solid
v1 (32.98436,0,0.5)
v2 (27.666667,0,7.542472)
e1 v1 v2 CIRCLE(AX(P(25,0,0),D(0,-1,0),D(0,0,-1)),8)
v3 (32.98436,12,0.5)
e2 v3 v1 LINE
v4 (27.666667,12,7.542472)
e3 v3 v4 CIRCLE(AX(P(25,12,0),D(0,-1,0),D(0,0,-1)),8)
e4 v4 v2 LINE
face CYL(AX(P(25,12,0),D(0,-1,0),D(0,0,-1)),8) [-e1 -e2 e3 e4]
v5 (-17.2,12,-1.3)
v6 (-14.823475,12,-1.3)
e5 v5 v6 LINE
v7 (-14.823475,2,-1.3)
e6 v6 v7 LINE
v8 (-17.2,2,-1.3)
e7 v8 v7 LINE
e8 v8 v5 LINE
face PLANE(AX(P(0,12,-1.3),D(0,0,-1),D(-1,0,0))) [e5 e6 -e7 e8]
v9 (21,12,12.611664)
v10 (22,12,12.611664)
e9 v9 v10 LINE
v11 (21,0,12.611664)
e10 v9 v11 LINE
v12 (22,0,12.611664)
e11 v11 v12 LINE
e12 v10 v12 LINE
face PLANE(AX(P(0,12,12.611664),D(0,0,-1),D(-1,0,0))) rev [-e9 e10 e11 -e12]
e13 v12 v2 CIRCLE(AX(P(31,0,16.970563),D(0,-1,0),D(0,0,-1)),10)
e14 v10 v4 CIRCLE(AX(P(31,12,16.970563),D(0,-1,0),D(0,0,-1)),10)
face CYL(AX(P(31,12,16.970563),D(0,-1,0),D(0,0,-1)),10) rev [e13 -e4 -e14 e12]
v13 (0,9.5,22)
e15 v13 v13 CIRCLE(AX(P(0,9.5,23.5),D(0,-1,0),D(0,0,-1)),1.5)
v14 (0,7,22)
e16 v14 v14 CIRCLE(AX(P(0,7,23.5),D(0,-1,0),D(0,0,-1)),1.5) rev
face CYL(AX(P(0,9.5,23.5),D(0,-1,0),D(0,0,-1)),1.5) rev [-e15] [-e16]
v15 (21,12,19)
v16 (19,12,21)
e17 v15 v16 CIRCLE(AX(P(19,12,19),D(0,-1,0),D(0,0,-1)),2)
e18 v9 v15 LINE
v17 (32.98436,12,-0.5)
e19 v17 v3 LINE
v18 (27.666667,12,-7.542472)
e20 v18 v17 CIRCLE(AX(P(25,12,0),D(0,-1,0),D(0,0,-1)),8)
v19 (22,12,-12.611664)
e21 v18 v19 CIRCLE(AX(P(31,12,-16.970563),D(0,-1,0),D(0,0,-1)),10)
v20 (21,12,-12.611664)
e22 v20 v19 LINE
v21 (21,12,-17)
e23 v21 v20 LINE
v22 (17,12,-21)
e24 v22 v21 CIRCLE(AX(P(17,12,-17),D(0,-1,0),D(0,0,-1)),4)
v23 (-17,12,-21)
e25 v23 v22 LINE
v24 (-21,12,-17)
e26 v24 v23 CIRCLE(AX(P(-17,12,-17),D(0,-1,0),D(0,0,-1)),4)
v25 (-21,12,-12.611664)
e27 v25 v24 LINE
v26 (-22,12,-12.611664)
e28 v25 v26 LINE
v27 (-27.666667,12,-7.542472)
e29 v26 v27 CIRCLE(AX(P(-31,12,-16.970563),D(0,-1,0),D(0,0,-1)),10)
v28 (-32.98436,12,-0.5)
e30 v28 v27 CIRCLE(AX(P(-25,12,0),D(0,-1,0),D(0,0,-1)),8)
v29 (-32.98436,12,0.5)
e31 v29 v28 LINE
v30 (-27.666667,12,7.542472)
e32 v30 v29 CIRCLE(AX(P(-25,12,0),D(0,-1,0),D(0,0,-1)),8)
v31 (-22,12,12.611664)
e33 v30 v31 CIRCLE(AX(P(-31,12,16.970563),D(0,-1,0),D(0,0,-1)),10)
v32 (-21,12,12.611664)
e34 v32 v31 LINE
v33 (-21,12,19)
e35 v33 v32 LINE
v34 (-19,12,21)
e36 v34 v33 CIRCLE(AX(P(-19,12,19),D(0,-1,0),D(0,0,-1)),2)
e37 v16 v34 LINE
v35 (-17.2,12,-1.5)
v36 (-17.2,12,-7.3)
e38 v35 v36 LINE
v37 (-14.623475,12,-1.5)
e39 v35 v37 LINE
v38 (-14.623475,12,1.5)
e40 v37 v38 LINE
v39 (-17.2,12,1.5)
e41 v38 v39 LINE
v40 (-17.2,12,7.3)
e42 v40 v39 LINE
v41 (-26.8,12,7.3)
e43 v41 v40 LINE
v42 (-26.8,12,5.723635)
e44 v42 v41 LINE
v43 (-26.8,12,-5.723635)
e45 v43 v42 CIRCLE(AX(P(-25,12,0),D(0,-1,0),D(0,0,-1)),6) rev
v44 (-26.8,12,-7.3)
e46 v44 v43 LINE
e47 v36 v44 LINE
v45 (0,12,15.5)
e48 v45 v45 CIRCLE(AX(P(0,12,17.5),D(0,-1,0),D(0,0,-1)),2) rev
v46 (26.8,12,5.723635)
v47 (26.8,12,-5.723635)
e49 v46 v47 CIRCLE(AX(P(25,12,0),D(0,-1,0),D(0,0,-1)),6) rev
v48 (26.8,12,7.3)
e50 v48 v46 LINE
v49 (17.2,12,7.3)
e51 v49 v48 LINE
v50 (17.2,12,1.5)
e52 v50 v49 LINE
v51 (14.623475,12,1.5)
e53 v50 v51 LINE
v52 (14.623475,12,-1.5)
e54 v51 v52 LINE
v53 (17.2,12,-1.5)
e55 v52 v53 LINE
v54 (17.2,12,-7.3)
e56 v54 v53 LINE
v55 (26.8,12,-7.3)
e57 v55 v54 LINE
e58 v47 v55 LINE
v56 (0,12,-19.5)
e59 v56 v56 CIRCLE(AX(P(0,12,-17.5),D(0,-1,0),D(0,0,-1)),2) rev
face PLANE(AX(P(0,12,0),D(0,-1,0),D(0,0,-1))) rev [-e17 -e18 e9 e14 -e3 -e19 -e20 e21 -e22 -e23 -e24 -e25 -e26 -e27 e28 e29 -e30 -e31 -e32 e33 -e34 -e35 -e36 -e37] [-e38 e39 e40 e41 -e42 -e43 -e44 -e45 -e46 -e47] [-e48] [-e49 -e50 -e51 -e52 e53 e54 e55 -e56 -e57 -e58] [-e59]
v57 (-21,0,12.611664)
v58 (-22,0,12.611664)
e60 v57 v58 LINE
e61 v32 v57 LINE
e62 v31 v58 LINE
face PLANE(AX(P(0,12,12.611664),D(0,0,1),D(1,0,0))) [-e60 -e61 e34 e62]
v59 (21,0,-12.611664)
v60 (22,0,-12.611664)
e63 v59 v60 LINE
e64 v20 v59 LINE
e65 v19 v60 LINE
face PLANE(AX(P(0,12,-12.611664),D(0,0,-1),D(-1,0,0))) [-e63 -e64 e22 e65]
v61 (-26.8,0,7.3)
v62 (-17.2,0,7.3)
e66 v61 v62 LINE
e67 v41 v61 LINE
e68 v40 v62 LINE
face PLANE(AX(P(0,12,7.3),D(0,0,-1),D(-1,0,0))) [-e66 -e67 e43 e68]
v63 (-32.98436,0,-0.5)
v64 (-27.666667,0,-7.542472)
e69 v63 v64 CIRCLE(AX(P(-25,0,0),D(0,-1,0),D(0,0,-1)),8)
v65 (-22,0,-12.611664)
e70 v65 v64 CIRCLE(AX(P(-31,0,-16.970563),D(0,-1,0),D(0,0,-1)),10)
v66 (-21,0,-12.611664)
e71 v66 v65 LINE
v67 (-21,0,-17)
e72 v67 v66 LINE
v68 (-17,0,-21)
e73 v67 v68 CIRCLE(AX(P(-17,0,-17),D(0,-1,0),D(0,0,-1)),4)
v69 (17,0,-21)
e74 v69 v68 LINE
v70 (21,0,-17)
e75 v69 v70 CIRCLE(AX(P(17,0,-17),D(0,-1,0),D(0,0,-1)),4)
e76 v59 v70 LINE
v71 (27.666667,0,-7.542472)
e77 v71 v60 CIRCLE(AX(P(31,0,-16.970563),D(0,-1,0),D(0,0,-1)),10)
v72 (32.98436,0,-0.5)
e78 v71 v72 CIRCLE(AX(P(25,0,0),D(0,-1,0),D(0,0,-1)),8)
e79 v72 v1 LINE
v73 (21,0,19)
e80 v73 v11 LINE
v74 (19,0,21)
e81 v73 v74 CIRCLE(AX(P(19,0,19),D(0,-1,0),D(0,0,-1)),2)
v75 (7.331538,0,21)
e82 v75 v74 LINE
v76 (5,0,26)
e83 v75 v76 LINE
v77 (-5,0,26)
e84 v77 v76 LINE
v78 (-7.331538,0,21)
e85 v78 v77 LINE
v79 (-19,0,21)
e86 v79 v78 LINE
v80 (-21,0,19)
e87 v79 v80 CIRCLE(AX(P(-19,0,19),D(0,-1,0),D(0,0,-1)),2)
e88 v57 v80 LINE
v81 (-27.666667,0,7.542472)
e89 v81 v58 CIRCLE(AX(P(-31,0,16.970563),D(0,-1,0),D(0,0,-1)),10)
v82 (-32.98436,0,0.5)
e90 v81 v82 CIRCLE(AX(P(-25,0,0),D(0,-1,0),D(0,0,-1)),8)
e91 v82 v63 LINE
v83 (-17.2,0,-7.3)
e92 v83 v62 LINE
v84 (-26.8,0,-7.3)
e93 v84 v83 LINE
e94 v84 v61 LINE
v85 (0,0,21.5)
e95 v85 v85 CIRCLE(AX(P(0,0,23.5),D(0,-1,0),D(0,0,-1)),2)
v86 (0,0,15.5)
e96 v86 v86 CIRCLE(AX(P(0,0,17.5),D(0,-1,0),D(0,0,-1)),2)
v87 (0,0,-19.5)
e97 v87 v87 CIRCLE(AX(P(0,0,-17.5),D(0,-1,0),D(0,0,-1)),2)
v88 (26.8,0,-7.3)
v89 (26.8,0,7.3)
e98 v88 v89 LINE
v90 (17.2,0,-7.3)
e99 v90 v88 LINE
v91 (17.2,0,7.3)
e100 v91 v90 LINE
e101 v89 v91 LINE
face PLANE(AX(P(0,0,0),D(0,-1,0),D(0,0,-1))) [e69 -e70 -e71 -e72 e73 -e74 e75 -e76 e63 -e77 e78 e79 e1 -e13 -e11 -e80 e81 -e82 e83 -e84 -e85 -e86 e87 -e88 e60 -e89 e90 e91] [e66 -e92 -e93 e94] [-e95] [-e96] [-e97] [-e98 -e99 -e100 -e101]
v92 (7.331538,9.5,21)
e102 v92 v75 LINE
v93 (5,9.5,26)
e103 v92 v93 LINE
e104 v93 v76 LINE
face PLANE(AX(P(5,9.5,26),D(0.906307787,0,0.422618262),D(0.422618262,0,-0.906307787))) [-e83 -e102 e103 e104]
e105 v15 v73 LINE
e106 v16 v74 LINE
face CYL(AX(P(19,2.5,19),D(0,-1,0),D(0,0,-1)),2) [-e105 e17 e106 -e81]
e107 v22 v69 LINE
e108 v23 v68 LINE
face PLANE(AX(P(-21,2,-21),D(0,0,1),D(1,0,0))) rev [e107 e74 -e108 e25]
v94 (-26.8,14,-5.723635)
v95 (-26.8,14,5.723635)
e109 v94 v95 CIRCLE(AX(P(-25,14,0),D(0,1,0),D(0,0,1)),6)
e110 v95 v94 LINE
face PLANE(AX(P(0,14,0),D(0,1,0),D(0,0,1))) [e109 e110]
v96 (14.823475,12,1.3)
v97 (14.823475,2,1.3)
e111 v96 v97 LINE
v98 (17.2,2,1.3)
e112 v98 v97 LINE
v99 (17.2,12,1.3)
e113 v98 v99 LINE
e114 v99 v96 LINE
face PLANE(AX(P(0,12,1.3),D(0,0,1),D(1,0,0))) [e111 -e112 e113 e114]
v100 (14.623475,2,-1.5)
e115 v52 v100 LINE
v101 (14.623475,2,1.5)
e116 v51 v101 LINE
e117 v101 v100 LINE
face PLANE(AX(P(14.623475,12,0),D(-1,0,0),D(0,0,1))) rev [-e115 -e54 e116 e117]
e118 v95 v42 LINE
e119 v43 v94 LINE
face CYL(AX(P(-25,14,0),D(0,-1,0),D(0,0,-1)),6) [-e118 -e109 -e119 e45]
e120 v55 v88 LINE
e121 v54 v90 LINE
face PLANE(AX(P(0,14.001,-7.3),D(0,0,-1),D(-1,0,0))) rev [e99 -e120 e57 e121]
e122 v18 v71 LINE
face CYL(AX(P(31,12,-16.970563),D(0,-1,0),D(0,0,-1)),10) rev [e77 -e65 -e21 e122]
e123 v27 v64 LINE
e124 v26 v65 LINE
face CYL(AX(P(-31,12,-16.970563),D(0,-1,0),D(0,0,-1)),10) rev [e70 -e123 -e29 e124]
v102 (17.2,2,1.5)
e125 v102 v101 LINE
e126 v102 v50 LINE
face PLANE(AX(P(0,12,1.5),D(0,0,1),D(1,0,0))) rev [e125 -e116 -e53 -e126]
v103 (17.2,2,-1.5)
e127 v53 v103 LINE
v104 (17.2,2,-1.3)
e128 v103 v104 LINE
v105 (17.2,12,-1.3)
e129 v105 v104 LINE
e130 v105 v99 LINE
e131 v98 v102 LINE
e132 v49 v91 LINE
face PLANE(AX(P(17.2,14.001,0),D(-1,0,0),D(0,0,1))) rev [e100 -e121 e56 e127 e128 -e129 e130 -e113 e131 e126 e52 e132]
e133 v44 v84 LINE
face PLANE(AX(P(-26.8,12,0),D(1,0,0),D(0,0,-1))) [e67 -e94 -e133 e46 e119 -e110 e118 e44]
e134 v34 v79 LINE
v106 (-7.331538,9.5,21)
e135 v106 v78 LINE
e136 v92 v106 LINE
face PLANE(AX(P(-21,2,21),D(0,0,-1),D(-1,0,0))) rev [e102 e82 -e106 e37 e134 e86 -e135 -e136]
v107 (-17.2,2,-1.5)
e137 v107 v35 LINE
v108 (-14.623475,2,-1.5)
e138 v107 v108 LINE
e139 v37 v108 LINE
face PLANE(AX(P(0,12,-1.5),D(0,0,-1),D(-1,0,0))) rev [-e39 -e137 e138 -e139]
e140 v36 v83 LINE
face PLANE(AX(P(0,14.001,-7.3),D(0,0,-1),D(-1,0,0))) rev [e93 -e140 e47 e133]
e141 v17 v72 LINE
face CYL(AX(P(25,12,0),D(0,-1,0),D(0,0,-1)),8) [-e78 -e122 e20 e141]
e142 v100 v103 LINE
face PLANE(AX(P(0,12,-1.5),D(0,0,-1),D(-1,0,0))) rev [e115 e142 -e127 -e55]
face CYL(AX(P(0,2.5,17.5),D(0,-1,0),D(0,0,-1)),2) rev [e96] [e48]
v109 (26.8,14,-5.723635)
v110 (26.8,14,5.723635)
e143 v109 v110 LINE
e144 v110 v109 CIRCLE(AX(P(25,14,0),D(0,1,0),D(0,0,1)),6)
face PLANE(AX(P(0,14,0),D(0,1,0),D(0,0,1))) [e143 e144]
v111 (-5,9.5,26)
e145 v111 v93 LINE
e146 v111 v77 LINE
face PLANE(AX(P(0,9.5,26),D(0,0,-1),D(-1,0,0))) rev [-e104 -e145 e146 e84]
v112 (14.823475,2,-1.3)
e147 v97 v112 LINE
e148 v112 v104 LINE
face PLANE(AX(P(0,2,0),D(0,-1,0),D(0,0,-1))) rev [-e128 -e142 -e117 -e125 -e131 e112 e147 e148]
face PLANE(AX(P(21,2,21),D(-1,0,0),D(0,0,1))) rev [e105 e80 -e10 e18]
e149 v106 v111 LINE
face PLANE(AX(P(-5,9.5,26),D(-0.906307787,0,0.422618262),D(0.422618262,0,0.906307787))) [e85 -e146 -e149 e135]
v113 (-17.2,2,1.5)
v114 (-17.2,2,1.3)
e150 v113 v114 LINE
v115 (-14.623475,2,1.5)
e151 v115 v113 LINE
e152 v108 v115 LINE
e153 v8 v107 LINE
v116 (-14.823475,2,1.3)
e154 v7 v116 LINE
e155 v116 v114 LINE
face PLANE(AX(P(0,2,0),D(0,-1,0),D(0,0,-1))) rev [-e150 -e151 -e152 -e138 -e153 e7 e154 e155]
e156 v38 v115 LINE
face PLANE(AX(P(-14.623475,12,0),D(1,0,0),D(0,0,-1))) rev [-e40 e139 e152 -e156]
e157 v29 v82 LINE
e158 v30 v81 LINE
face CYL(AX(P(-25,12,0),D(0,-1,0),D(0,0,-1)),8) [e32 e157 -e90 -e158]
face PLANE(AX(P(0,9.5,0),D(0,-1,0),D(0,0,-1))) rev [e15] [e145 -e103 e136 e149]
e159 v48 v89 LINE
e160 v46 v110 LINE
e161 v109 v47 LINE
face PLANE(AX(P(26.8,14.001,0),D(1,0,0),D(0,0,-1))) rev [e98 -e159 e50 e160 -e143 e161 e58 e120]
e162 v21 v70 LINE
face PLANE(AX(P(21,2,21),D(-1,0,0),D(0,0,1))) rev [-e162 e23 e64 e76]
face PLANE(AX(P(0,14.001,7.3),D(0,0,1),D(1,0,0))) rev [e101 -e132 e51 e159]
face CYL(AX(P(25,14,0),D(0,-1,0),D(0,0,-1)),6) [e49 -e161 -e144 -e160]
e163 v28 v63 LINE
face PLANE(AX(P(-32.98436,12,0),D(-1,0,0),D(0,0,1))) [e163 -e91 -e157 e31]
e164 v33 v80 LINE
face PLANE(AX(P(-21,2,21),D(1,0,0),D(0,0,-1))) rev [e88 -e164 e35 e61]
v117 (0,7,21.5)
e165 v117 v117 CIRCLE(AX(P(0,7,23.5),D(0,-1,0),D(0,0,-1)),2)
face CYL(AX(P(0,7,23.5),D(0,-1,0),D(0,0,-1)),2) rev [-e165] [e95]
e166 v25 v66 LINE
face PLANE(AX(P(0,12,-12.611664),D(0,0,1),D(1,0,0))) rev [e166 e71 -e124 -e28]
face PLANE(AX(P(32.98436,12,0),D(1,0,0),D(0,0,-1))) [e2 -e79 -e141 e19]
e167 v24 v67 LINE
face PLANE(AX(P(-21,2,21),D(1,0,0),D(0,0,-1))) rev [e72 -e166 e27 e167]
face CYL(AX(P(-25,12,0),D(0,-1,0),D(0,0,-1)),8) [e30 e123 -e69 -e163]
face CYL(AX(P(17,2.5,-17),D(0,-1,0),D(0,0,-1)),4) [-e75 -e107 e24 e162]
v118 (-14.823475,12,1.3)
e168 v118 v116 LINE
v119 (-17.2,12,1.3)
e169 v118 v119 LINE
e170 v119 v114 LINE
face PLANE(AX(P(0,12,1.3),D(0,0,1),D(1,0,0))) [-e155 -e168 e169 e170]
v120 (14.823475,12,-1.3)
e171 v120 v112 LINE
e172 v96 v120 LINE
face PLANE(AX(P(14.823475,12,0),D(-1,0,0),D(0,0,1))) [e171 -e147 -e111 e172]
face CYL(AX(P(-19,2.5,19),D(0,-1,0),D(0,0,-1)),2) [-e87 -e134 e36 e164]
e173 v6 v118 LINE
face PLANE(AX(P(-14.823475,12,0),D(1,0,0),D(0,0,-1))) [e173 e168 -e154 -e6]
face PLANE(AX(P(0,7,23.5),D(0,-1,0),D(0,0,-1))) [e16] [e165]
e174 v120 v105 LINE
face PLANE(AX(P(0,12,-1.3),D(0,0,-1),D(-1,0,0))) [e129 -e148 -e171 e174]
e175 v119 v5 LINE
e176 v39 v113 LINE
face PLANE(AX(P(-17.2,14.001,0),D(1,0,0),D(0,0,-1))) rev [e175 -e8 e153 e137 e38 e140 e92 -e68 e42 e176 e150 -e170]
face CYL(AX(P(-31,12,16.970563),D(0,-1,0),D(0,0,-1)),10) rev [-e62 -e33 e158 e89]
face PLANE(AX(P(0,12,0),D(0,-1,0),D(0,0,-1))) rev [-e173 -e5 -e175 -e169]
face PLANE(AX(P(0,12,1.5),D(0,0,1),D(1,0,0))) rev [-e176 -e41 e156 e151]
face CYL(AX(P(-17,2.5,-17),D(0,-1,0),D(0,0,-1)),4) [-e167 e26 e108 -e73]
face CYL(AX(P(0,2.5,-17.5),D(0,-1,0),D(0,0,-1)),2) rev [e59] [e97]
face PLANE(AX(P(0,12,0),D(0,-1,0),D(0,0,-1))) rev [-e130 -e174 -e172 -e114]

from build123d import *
from build123d.topology import SkipClean

# Parameters (mm, degrees)
SKETCH_1_W          = 42
SKETCH_1_H          = 42
EXTRUDE_1_DEPTH     = 2
EXTRUDE_2_DEPTH     = 0.5
SKETCH_3_R          = 2
SKETCH_3_R_2        = 1
CUT_EXTRUDE_1_DEPTH = 30.803523282
EXTRUDE_START       = -12
EXTRUDE_3_OUTLINE_R = 2
EXTRUDE_3_DEPTH     = 12
EXTRUDE_4_DEPTH     = 2
EXTRUDE_5_DEPTH     = 9.5
DRAFT_1_DEPTH       = 9.5
SKETCH_8_R          = 2
CUT_EXTRUDE_2_DEPTH = 7
CUT_EXTRUDE_3_REACH = 46.272
SKETCH_9_W          = 9.6
SKETCH_9_H          = 14.6
SKETCH_9_W_2        = 9
SKETCH_9_H_2        = 14


# Read off the part's stored shape, not the designer's step: Бобышка-Вытянуть3, Уклон1
with BuildPart() as part:
    # Эскиз1 → Бобышка-Вытянуть1 (new body)
    with BuildSketch(Plane(origin=(0, 0, 0), x_dir=(1, 0, 0), z_dir=(0, 1, 0))):
        Rectangle(SKETCH_1_W, SKETCH_1_H)
    extrude(amount=EXTRUDE_1_DEPTH)

    # Эскиз2 → Бобышка-Вытянуть2 (add)
    with BuildSketch(Plane(origin=(0, 2, 0), x_dir=(1, 0, 0), z_dir=(0, 1, 0))):
        with BuildLine():
            Line((-1.778376117, -14.123475383), (1.778376117, -14.123475383))
            ThreePointArc((1.778376117, -14.123475383), (15.863961031, -15.863961031), (14.123475383, -1.778376117))
            Line((14.123475383, -1.778376117), (14.123475383, 1.778376117))
            ThreePointArc((14.123475383, 1.778376117), (15.863961031, 15.863961031), (1.778376117, 14.123475383))
            Line((1.778376117, 14.123475383), (-1.778376117, 14.123475383))
            ThreePointArc((-1.778376117, 14.123475383), (-15.863961031, 15.863961031), (-14.123475383, 1.778376117))
            Line((-14.123475383, 1.778376117), (-14.123475383, -1.778376117))
            ThreePointArc((-14.123475383, -1.778376117), (-15.863961031, -15.863961031), (-1.778376117, -14.123475383))
        make_face()
    extrude(amount=EXTRUDE_2_DEPTH)

    # Эскиз3 → Вырез-Вытянуть1 (cut, through all)
    # profile 1 of 7: a face of its own
    with BuildSketch(Plane.XZ):
        with Locations(Location((0, -17.5, 0), (0, 0, 270))):
            Circle(SKETCH_3_R)
        with Locations((0, -17.5)):
            Circle(SKETCH_3_R_2, mode=Mode.SUBTRACT)
    # profile 2 of 7: a face of its own
    with BuildSketch(Plane.XZ):
        with BuildLine():
            Line((-21, -21), (-17, -21))
            ThreePointArc((-17, -21), (-19.828427125, -19.828427125), (-21, -17))
            Line((-21, -17), (-21, -21))
        make_face()
    # profile 3 of 7: a face of its own
    with BuildSketch(Plane.XZ):
        with BuildLine():
            ThreePointArc((21, -17), (19.828427125, -19.828427125), (17, -21))
            Line((17, -21), (21, -21))
            Line((21, -21), (21, -17))
        make_face()
    # profile 4 of 7: a face of its own
    with BuildSketch(Plane.XZ):
        with BuildLine():
            Line((21, 21), (19, 21))
            ThreePointArc((19, 21), (20.414213562, 20.414213562), (21, 19))
            Line((21, 19), (21, 21))
        make_face()
    # profile 5 of 7: a face of its own
    with BuildSketch(Plane.XZ):
        with Locations(Location((0, 17.5, 0), (0, 0, 270))):
            Circle(SKETCH_3_R)
        with Locations((0, 17.5)):
            Circle(SKETCH_3_R_2, mode=Mode.SUBTRACT)
    # profile 6 of 7: a face of its own
    with BuildSketch(Plane.XZ):
        with Locations((0, 17.5)):
            Circle(SKETCH_3_R_2)
    # profile 7 of 7: a face of its own
    with BuildSketch(Plane.XZ):
        with BuildLine():
            Line((-21, 21), (-21, 19))
            ThreePointArc((-21, 19), (-20.414213562, 20.414213562), (-19, 21))
            Line((-19, 21), (-21, 21))
        make_face()
    extrude(amount=-CUT_EXTRUDE_1_DEPTH, mode=Mode.SUBTRACT)


with BuildPart() as cut_extrude_1_kept_piece:
    # of the separate pieces the step leaves, the one the design keeps (cut_extrude_1_pieces_kept)
    add(part.part.solids().sort_by_distance((-19, 0, 21))[0])

    # Бобышка-Вытянуть3 outline → Бобышка-Вытянуть3 (add)
    with SkipClean():  # the faces are left unmerged after this step: merging them gives an invalid solid
        with BuildSketch(Plane.XZ.offset(EXTRUDE_START)):
            with BuildLine():
                Line((-22, -12.611663805), (-21, -12.611663805))
                Line((-21, -12.611663805), (-21, -17))
                ThreePointArc((-21, -17), (-19.828427125, -19.828427125), (-17, -21))
                Line((-17, -21), (17, -21))
                ThreePointArc((17, -21), (19.828427125, -19.828427125), (21, -17))
                Line((21, -17), (21, -12.611663805))
                Line((21, -12.611663805), (22, -12.611663805))
                ThreePointArc((22, -12.611663805), (24.332770191, -9.517506551), (27.666666667, -7.542472333))
                ThreePointArc((27.666666667, -7.542472333), (31.384371141, -4.820768106), (32.984359711, -0.5))
                Line((32.984359711, -0.5), (32.984359711, 0.5))
                ThreePointArc((32.984359711, 0.5), (31.384371141, 4.820768106), (27.666666667, 7.542472333))
                ThreePointArc((27.666666667, 7.542472333), (24.332770191, 9.517506551), (22, 12.611663805))
                Line((22, 12.611663805), (21, 12.611663805))
                Line((21, 12.611663805), (21, 19))
                ThreePointArc((21, 19), (20.414213562, 20.414213562), (19, 21))
                Line((19, 21), (-19, 21))
                ThreePointArc((-19, 21), (-20.414213562, 20.414213562), (-21, 19))
                Line((-21, 19), (-21, 12.611663805))
                Line((-21, 12.611663805), (-22, 12.611663805))
                ThreePointArc((-22, 12.611663805), (-24.332770191, 9.517506551), (-27.666666667, 7.542472333))
                ThreePointArc((-27.666666667, 7.542472333), (-31.384371141, 4.820768106), (-32.984359711, 0.5))
                Line((-32.984359711, 0.5), (-32.984359711, -0.5))
                ThreePointArc((-32.984359711, -0.5), (-31.384371141, -4.820768106), (-27.666666667, -7.542472333))
                ThreePointArc((-27.666666667, -7.542472333), (-24.332770191, -9.517506551), (-22, -12.611663805))
            make_face()
            with BuildLine():
                Line((-26.8, 7.3), (-21, 7.3))
                Line((-21, 7.3), (-21, 5.123475383))
                ThreePointArc((-21, 5.123475383), (-23.765130637, 6.381621867), (-26.8, 6.245798588))
                Line((-26.8, 6.245798588), (-26.8, 7.3))
            make_face(mode=Mode.SUBTRACT)
            with BuildLine():
                Line((14.623475383, -1.5), (14.623475383, 1.5))
                Line((14.623475383, 1.5), (18.67544468, 1.5))
                ThreePointArc((18.67544468, 1.5), (18.652597901, 1.400173775), (18.631326669, 1.3))
                Line((18.631326669, 1.3), (14.823475383, 1.3))
                Line((14.823475383, 1.3), (14.823475383, -1.3))
                Line((14.823475383, -1.3), (18.631326669, -1.3))
                ThreePointArc((18.631326669, -1.3), (18.652597901, -1.400173775), (18.67544468, -1.5))
                Line((18.67544468, -1.5), (14.623475383, -1.5))
            make_face(mode=Mode.SUBTRACT)
            with Locations((0, 17.5)):
                Circle(EXTRUDE_3_OUTLINE_R, mode=Mode.SUBTRACT)
            with Locations((0, -17.5)):
                Circle(EXTRUDE_3_OUTLINE_R, mode=Mode.SUBTRACT)
            with BuildLine():
                Line((-14.623475383, -1.5), (-18.67544468, -1.5))
                ThreePointArc((-18.67544468, -1.5), (-18.652597901, -1.400173775), (-18.631326669, -1.3))
                Line((-18.631326669, -1.3), (-14.823475383, -1.3))
                Line((-14.823475383, -1.3), (-14.823475383, 1.3))
                Line((-14.823475383, 1.3), (-18.631326669, 1.3))
                ThreePointArc((-18.631326669, 1.3), (-18.652597901, 1.400173775), (-18.67544468, 1.5))
                Line((-18.67544468, 1.5), (-14.623475383, 1.5))
                Line((-14.623475383, 1.5), (-14.623475383, -1.5))
            make_face(mode=Mode.SUBTRACT)
        extrude(amount=EXTRUDE_3_DEPTH)

    # Эскиз6 → Бобышка-Вытянуть4 (add)
    with SkipClean():  # the faces are left unmerged after this step: merging them gives an invalid solid
        with BuildSketch(Plane(origin=(0, 12, 0), x_dir=(1, 0, 0), z_dir=(0, 1, 0))):
            with BuildLine():
                ThreePointArc((-19.161948935, -1.384615385), (-19, 0), (-19.161948935, 1.384615385))
                ThreePointArc((-19.161948935, 1.384615385), (-19.949874575, 3.239789066), (-21.307692308, 4.729361892))
                ThreePointArc((-21.307692308, 4.729361892), (-31, 0), (-21.307692308, -4.729361892))
                ThreePointArc((-21.307692308, -4.729361892), (-19.949874575, -3.239789066), (-19.161948935, -1.384615385))
            make_face()
            with BuildLine():
                ThreePointArc((19.161948935, 1.384615385), (19, 0), (19.161948935, -1.384615385))
                ThreePointArc((19.161948935, -1.384615385), (19.949874575, -3.239789066), (21.307692308, -4.729361892))
                ThreePointArc((21.307692308, -4.729361892), (31, 0), (21.307692308, 4.729361892))
                ThreePointArc((21.307692308, 4.729361892), (19.949874575, 3.239789066), (19.161948935, 1.384615385))
            make_face()
        extrude(amount=EXTRUDE_4_DEPTH)

    # Эскиз7 → Бобышка-Вытянуть5 (add)
    with SkipClean():  # the faces are left unmerged after this step: merging them gives an invalid solid
        with BuildSketch(Plane.XZ):
            with BuildLine():
                Line((0, 22), (0, 21))
                Line((0, 21), (5, 21))
                Line((5, 21), (5, 26))
                Line((5, 26), (0, 26))
                Line((0, 26), (0, 25))
                ThreePointArc((0, 25), (1.060660172, 24.560660172), (1.5, 23.5))
                ThreePointArc((1.5, 23.5), (1.060660172, 22.439339828), (0, 22))
            make_face()
            with BuildLine():
                Line((-5, 21), (0, 21))
                Line((0, 21), (0, 22))
                ThreePointArc((0, 22), (-1.5, 23.5), (0, 25))
                Line((0, 25), (0, 26))
                Line((0, 26), (-5, 26))
                Line((-5, 26), (-5, 21))
            make_face()
        extrude(amount=-EXTRUDE_5_DEPTH)

    # Уклон1 outline → Уклон1 (add)
    with SkipClean():  # the faces are left unmerged after this step: merging them gives an invalid solid
        with BuildSketch(Plane(origin=(0, 0, 0), x_dir=(1, 0, 0), z_dir=(0, 1, 0))):
            Polygon((-5, -21), (-7.331538291, -21), (-5, -26), align=None)
            Polygon((7.331538291, -21), (5, -21), (5, -26), align=None)
        extrude(amount=DRAFT_1_DEPTH)

    # Эскиз8 → Вырез-Вытянуть2 (cut)
    with SkipClean():  # the faces are left unmerged after this step: merging them gives an invalid solid
        with BuildSketch(Plane.XZ):
            with Locations(Location((0, 23.5, 0), (0, 0, 270))):
                Circle(SKETCH_8_R)
        extrude(amount=-CUT_EXTRUDE_2_DEPTH, mode=Mode.SUBTRACT)

    # Эскиз9 → Вырез-Вытянуть3 (cut, up to next)
    with BuildSketch(Plane.XZ, mode=Mode.PRIVATE) as cut_extrude_3_sk1:
        with Locations((-22, 0)):
            Rectangle(SKETCH_9_W, SKETCH_9_H)
        with Locations((-22, 0)):
            Rectangle(SKETCH_9_W_2, SKETCH_9_H_2, mode=Mode.SUBTRACT)
    cut_extrude_3_tool1 = extrude(cut_extrude_3_sk1.sketch, amount=-CUT_EXTRUDE_3_REACH, mode=Mode.PRIVATE) & cut_extrude_1_kept_piece.part
    # Эскиз9 → Вырез-Вытянуть3 (cut, up to next)
    with BuildSketch(Plane.XZ, mode=Mode.PRIVATE) as cut_extrude_3_sk2:
        with Locations((-22, 0)):
            Rectangle(SKETCH_9_W_2, SKETCH_9_H_2)
    cut_extrude_3_tool2 = extrude(cut_extrude_3_sk2.sketch, amount=-CUT_EXTRUDE_3_REACH, mode=Mode.PRIVATE) & cut_extrude_1_kept_piece.part
    # Эскиз9 → Вырез-Вытянуть3 (cut, up to next)
    with BuildSketch(Plane.XZ, mode=Mode.PRIVATE) as cut_extrude_3_sk3:
        with Locations((22, 0)):
            Rectangle(SKETCH_9_W, SKETCH_9_H)
        with Locations((22, 0)):
            Rectangle(SKETCH_9_W_2, SKETCH_9_H_2, mode=Mode.SUBTRACT)
    cut_extrude_3_tool3 = extrude(cut_extrude_3_sk3.sketch, amount=-CUT_EXTRUDE_3_REACH, mode=Mode.PRIVATE) & cut_extrude_1_kept_piece.part
    # Эскиз9 → Вырез-Вытянуть3 (cut, up to next)
    with BuildSketch(Plane.XZ, mode=Mode.PRIVATE) as cut_extrude_3_sk4:
        with Locations((22, 0)):
            Rectangle(SKETCH_9_W_2, SKETCH_9_H_2)
    cut_extrude_3_tool4 = extrude(cut_extrude_3_sk4.sketch, amount=-CUT_EXTRUDE_3_REACH, mode=Mode.PRIVATE) & cut_extrude_1_kept_piece.part
    add(cut_extrude_3_tool1.solids().sort_by_distance((-26.625266, 0, 0))[0], mode=Mode.SUBTRACT)
    add(cut_extrude_3_tool2.solids().sort_by_distance((-22, 0, 0))[0], mode=Mode.SUBTRACT)
    add(cut_extrude_3_tool3.solids().sort_by_distance((17.374734, 0, 0))[0], mode=Mode.SUBTRACT)
    add(cut_extrude_3_tool4.solids().sort_by_distance((22, 0, 0))[0], mode=Mode.SUBTRACT)


solid = cut_extrude_1_kept_piece.part
